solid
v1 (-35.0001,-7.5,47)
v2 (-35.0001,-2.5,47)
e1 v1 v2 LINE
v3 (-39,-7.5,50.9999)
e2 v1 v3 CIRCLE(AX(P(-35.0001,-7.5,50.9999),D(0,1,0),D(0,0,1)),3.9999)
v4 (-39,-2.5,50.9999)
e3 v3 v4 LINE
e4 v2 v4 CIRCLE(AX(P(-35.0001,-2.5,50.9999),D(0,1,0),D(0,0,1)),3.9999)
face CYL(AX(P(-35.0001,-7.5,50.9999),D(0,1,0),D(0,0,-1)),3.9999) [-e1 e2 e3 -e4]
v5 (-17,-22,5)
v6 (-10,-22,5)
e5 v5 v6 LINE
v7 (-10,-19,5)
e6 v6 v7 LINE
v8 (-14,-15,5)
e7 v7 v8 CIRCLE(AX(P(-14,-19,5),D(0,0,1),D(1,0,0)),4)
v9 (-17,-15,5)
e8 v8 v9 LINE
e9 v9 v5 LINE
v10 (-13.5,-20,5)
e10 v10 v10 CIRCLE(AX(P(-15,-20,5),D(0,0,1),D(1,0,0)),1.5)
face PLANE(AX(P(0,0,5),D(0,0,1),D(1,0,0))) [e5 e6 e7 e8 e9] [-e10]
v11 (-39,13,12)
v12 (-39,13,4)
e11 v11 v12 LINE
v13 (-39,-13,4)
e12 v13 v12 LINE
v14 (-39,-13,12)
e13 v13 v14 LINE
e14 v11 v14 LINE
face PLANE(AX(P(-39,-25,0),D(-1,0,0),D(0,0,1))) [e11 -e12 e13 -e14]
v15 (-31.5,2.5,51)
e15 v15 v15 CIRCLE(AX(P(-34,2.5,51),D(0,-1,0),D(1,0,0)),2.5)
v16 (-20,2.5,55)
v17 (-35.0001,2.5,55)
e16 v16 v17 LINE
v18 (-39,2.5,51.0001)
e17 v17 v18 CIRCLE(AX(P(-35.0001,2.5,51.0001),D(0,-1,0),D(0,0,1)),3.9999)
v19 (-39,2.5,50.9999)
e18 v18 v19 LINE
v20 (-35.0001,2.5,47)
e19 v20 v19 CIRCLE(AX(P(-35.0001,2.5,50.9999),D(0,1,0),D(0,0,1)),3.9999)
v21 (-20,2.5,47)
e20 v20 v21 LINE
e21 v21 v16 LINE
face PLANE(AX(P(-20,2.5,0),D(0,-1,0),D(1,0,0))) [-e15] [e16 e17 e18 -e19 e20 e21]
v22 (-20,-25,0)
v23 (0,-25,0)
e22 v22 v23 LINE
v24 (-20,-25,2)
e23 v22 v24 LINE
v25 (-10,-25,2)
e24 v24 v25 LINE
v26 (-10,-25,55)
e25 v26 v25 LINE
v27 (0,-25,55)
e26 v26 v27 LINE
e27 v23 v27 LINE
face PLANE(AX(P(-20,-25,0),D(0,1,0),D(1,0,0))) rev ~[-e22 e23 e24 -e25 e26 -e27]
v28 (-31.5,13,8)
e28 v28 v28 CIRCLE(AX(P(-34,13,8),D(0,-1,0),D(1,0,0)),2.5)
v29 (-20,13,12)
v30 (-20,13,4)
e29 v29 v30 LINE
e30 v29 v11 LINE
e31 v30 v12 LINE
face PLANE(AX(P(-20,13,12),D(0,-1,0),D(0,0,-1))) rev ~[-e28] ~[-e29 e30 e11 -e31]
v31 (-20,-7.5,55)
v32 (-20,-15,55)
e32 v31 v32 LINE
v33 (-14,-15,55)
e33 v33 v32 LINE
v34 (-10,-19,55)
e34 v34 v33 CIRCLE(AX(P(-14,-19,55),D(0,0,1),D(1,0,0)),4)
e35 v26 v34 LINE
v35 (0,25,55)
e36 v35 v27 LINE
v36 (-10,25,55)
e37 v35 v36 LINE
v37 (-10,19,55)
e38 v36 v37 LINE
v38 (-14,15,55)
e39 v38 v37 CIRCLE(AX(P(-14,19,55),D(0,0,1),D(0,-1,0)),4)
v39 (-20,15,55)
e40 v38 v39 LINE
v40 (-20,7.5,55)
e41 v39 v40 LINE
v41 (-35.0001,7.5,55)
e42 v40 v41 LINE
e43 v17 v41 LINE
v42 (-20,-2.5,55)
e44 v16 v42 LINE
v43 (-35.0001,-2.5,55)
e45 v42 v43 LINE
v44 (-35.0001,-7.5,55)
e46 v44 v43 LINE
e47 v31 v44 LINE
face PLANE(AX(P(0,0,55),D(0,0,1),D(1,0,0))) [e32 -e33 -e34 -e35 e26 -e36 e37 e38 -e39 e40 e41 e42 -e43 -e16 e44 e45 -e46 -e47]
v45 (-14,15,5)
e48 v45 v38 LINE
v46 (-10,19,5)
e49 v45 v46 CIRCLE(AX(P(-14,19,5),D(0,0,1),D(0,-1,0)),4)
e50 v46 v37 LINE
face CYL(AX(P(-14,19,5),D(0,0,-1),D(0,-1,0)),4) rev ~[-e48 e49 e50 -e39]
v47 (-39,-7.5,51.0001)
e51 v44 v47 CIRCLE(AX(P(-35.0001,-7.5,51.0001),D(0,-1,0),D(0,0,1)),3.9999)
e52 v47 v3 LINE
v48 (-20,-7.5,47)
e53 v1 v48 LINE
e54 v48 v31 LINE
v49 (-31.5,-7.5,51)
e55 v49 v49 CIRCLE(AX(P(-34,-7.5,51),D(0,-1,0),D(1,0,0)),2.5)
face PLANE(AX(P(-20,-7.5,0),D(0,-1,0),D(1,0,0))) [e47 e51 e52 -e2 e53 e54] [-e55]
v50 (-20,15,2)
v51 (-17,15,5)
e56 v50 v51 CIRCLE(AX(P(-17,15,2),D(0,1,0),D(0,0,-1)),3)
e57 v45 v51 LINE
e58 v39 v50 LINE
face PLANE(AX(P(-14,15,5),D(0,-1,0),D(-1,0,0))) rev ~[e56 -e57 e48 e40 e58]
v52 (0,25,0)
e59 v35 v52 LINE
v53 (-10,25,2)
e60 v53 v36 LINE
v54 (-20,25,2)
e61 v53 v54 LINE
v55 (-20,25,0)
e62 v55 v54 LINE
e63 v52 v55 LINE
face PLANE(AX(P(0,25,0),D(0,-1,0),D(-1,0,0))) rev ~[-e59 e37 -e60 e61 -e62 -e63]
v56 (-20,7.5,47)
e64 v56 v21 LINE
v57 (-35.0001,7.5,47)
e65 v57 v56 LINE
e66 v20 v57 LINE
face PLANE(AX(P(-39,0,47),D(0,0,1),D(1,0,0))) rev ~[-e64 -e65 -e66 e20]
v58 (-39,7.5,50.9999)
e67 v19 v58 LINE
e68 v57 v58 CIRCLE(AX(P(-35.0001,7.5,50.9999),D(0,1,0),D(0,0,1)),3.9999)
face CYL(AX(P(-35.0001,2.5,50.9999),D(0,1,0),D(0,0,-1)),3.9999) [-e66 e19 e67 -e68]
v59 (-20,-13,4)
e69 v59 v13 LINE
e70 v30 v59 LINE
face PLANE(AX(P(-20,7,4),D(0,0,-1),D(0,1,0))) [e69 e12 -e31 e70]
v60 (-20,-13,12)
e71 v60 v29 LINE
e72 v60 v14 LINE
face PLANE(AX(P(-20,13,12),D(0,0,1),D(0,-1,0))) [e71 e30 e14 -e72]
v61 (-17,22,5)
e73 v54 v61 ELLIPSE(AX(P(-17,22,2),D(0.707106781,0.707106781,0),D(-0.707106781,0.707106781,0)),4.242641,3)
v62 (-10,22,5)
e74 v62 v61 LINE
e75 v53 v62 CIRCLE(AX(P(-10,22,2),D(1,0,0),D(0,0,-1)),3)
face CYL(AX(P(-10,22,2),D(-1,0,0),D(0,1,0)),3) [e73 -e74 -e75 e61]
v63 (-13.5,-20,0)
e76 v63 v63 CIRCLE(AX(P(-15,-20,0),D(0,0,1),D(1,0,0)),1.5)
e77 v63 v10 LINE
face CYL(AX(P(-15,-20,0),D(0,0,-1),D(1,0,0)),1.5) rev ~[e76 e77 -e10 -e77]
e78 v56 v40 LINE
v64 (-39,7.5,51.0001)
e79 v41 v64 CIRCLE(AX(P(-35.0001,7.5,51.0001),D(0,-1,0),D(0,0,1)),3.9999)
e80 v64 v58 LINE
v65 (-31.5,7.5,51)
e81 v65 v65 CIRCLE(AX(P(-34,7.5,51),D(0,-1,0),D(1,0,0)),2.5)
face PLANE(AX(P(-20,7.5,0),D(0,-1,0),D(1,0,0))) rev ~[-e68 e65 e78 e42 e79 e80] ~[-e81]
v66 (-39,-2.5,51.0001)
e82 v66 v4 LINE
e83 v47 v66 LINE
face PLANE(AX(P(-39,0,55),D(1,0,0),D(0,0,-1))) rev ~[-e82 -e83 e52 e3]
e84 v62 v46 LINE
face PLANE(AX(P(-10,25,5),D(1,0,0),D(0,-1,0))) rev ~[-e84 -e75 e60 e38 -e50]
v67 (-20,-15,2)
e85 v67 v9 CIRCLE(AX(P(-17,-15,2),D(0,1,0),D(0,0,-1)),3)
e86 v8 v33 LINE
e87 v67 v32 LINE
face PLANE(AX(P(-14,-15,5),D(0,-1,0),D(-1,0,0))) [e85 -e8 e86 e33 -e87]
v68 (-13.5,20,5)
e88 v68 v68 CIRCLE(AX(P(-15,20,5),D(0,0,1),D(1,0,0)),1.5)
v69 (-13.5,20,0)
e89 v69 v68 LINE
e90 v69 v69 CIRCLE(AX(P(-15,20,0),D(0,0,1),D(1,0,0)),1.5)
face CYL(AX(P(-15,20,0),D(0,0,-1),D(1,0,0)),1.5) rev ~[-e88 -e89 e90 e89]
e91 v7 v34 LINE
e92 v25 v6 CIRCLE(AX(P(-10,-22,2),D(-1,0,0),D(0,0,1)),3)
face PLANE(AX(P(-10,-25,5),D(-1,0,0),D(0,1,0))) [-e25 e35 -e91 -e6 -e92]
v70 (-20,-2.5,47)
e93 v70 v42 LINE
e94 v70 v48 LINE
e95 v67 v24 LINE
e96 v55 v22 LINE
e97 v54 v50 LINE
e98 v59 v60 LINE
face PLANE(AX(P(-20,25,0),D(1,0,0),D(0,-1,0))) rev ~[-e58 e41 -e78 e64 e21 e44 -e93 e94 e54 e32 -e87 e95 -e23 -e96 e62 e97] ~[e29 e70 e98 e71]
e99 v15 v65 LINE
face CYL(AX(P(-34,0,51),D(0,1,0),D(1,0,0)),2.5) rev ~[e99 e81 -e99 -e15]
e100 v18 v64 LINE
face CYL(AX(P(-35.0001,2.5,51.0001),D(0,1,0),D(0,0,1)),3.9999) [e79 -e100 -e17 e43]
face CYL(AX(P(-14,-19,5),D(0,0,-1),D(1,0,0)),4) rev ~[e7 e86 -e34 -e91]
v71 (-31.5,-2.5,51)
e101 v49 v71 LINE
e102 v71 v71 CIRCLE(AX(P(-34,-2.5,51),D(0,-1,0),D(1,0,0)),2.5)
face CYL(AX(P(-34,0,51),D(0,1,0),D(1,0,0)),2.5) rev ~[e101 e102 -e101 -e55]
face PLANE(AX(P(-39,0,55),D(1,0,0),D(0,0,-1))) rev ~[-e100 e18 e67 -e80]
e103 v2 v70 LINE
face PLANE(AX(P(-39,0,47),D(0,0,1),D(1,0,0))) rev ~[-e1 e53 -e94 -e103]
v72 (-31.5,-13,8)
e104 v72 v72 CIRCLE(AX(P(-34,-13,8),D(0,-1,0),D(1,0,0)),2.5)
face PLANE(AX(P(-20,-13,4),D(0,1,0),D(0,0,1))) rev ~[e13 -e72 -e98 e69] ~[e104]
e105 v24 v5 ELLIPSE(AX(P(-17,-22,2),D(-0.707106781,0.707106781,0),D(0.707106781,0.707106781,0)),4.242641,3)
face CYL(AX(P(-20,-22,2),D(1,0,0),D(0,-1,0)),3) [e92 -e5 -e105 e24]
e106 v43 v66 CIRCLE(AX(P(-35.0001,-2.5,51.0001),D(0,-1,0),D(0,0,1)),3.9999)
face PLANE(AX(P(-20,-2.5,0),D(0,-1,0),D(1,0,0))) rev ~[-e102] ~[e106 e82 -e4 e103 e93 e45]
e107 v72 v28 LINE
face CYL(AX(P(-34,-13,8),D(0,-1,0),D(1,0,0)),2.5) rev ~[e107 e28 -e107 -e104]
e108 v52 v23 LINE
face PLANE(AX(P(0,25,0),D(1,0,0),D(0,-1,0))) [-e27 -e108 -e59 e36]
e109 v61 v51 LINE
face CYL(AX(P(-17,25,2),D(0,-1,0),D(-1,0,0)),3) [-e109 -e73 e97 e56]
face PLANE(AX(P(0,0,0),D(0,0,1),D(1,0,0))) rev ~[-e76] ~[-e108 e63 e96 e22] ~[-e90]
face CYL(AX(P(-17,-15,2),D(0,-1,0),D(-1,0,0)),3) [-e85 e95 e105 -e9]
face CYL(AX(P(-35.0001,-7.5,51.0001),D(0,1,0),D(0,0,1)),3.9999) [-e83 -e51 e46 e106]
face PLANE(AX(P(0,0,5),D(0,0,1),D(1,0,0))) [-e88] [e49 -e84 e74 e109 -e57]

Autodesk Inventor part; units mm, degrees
ref_plane "YZ Plane" through (0, 0, 0) normal (1, 0, 0) x (0, 1, 0)
ref_plane "XZ Plane" through (0, 0, 0) normal (0, 1, 0) x (-1, 0, 0)
sketch "스케치1" plane through (0, 0, 0) normal (0, 0, 1) x (1, 0, 0)
  line L0 (-20, -25) -> (20, -25)
  line L1 (20, -25) -> (20, 25)
  line L2 (20, 25) -> (-20, 25)
  line L3 (-20, 25) -> (-20, -25)
  line L4 (-20, -25) -> (20, 25) construction
  line L5 (20, -25) -> (-20, 25) construction
  circle A0 centre (-15, 20) radius 1.5
  circle A1 centre (-15, -20) radius 1.5
  circle A2 centre (15, 20) radius 1.5
  circle A3 centre (15, -20) radius 1.5
  line L6 (0, 25) -> (0, -25)
  point P0 (0, 0)
  point P1 (-20, 0)
  dimension "d0" = 40
  dimension "d1" = 50
  dimension "d2" = 30
  dimension "d3" = 15
  dimension "d4" = 40
  dimension "d6" = 20
  dimension "d7" = 3
extrude "돌출1" add sketch "스케치1" along normal blind 5 contours L3 L2 L6 L0
sketch "스케치2" plane through (0, 0, 5) normal (0, 0, 1) x (1, 0, 0)
  circle A0 centre (15, -20) radius 1.5 projected
  circle A1 centre (-15, -20) radius 1.5 projected
  line L0 (0, 25) -> (-20, 25) projected
  line L1 (-20, 25) -> (-20, -25) projected
  line L2 (-20, -25) -> (0, -25) projected
  circle A2 centre (-15, 20) radius 1.5 projected
  circle A3 centre (-15, -20) radius 1.5 projected
  line L3 (-20, -25) -> (20, -25) projected
  line L4 (14, -15) -> (20, -15)
  line L5 (10, -25) -> (10, -19)
  arc A4 (14, -15) -> (10, -19) centre (14, -19) ccw
  line L6 (-28, 0) -> (28, 0) projected
  line L7 (0, -35) -> (0, 35) projected
  line L8 (-14, -15) -> (-20, -15)
  line L9 (-10, -25) -> (-10, -19)
  arc A5 (-10, -19) -> (-14, -15) centre (-14, -19) ccw
  line L10 (14, 15) -> (20, 15)
  line L11 (10, 25) -> (10, 19)
  arc A6 (10, 19) -> (14, 15) centre (14, 19) ccw
  line L12 (-10, 25) -> (-10, 19)
  arc A7 (-14, 15) -> (-10, 19) centre (-14, 19) ccw
  line L13 (-14, 15) -> (-20, 15)
  line L14 (0, -25) -> (0, 25) projected
  point P0 (10, -15)
  point P1 (0, 0)
  dimension "d13" = 10
  dimension "d16" = 4
extrude "돌출2" add sketch "스케치2" along normal blind 50 contours L7 L6 L1 L13 A7 L12 L0 | L7 L2 L9 A5 L8 L1 L6
fillet "모깎기1" radius 3 4 edges at (-15, -25, 5) (-20, -20, 5) (-15, 25, 5) (-20, 20, 5)
sketch "스케치3" plane through (-20, -25, 0) normal (-1, 0, 0) x (0, 0, 1)
  line L0 (2, 40) -> (55, 40) projected
  line L1 (5, 10) -> (55, 10) projected
  line L2 (4, 40) -> (12, 40)
  line L3 (12, 40) -> (12, 10)
  line L4 (12, 10) -> (4, 10)
  line L5 (4, 10) -> (4, 40)
  line L6 (0, 50) -> (0, 0) projected
  line L7 (12, 32) -> (4, 32)
  line L8 (4, 32) -> (4, 18)
  line L9 (4, 18) -> (12, 18)
  line L10 (12, 18) -> (12, 32)
  line L11 (12, 38) -> (4, 38)
  line L12 (4, 38) -> (4, 12)
  line L13 (4, 12) -> (12, 12)
  line L14 (12, 12) -> (12, 38)
  point P0 (0, 25)
  point P1 (15, 10)
  point P2 (12, 25)
  point P3 (4, 25)
  point P4 (12, 18)
  point P5 (12, 25)
  point P6 (8, 12)
  dimension "d17" = 8
  dimension "d18" = 4
  dimension "d21" = 8
  dimension "d28" = 26
extrude "돌출3" add sketch "스케치3" along normal blind 19 contours L11 L3 L7 L5 | L7 L3 L9 L5 | L9 L3 L13 L5
sketch "스케치5" plane through (-20, -13, 4) normal (0, -1, 0) x (1, 0, 0)
  circle A0 centre (-14, 4) radius 2.5
  line L0 (-19, 0) -> (-19, 8) projected
  point P0 (20, -4)
  point P1 (-19, 4)
  dimension "d29" = 5
  dimension "d30" = 5
extrude "돌출5" cut sketch "스케치5" against normal through all
ref_plane "작업 평면1" through (-20, 0, 0) normal (0, -1, 0) x (1, 0, 0)
sketch "스케치6" plane through (-20, 0, 0) normal (0, -1, 0) x (1, 0, 0)
  line L0 (0, 2) -> (0, 55) projected
  line L1 (0, 55) -> (-19, 55)
  line L2 (-19, 55) -> (-19, 47)
  line L3 (-19, 47) -> (0, 47)
  line L4 (0, 47) -> (0, 55)
  line L5 (-19, 12) -> (-19, 4) projected
  circle A0 centre (-14, 51) radius 2.5
  circle A1 centre (-14, 8) radius 2.5 projected
  point P0 (20, 0)
  point P1 (0, 47)
  dimension "d31" = 0
  dimension "d33" = 8
  dimension "d34" = 8
  dimension "d35" = 4
extrude "돌출6" add sketch "스케치6" along normal mid plane 15 contours L3 L2 L1 L0
extrude "돌출7" cut sketch "스케치6" along normal mid plane 5 contours L3 L2 L1 L0
fillet "모깎기2" radius 4 4 edges at (-39, 5, 55) (-39, 5, 47) (-39, -5, 55) (-39, -5, 47)
equation "\"d3\" = 0.5 * d2"
equation "\"d6\" = 0.5 * d4"
equation "\"d34\" = d33"
equation "\"d35\" = 0.5 * d34"
properties part number "SuspensionSupporter"
